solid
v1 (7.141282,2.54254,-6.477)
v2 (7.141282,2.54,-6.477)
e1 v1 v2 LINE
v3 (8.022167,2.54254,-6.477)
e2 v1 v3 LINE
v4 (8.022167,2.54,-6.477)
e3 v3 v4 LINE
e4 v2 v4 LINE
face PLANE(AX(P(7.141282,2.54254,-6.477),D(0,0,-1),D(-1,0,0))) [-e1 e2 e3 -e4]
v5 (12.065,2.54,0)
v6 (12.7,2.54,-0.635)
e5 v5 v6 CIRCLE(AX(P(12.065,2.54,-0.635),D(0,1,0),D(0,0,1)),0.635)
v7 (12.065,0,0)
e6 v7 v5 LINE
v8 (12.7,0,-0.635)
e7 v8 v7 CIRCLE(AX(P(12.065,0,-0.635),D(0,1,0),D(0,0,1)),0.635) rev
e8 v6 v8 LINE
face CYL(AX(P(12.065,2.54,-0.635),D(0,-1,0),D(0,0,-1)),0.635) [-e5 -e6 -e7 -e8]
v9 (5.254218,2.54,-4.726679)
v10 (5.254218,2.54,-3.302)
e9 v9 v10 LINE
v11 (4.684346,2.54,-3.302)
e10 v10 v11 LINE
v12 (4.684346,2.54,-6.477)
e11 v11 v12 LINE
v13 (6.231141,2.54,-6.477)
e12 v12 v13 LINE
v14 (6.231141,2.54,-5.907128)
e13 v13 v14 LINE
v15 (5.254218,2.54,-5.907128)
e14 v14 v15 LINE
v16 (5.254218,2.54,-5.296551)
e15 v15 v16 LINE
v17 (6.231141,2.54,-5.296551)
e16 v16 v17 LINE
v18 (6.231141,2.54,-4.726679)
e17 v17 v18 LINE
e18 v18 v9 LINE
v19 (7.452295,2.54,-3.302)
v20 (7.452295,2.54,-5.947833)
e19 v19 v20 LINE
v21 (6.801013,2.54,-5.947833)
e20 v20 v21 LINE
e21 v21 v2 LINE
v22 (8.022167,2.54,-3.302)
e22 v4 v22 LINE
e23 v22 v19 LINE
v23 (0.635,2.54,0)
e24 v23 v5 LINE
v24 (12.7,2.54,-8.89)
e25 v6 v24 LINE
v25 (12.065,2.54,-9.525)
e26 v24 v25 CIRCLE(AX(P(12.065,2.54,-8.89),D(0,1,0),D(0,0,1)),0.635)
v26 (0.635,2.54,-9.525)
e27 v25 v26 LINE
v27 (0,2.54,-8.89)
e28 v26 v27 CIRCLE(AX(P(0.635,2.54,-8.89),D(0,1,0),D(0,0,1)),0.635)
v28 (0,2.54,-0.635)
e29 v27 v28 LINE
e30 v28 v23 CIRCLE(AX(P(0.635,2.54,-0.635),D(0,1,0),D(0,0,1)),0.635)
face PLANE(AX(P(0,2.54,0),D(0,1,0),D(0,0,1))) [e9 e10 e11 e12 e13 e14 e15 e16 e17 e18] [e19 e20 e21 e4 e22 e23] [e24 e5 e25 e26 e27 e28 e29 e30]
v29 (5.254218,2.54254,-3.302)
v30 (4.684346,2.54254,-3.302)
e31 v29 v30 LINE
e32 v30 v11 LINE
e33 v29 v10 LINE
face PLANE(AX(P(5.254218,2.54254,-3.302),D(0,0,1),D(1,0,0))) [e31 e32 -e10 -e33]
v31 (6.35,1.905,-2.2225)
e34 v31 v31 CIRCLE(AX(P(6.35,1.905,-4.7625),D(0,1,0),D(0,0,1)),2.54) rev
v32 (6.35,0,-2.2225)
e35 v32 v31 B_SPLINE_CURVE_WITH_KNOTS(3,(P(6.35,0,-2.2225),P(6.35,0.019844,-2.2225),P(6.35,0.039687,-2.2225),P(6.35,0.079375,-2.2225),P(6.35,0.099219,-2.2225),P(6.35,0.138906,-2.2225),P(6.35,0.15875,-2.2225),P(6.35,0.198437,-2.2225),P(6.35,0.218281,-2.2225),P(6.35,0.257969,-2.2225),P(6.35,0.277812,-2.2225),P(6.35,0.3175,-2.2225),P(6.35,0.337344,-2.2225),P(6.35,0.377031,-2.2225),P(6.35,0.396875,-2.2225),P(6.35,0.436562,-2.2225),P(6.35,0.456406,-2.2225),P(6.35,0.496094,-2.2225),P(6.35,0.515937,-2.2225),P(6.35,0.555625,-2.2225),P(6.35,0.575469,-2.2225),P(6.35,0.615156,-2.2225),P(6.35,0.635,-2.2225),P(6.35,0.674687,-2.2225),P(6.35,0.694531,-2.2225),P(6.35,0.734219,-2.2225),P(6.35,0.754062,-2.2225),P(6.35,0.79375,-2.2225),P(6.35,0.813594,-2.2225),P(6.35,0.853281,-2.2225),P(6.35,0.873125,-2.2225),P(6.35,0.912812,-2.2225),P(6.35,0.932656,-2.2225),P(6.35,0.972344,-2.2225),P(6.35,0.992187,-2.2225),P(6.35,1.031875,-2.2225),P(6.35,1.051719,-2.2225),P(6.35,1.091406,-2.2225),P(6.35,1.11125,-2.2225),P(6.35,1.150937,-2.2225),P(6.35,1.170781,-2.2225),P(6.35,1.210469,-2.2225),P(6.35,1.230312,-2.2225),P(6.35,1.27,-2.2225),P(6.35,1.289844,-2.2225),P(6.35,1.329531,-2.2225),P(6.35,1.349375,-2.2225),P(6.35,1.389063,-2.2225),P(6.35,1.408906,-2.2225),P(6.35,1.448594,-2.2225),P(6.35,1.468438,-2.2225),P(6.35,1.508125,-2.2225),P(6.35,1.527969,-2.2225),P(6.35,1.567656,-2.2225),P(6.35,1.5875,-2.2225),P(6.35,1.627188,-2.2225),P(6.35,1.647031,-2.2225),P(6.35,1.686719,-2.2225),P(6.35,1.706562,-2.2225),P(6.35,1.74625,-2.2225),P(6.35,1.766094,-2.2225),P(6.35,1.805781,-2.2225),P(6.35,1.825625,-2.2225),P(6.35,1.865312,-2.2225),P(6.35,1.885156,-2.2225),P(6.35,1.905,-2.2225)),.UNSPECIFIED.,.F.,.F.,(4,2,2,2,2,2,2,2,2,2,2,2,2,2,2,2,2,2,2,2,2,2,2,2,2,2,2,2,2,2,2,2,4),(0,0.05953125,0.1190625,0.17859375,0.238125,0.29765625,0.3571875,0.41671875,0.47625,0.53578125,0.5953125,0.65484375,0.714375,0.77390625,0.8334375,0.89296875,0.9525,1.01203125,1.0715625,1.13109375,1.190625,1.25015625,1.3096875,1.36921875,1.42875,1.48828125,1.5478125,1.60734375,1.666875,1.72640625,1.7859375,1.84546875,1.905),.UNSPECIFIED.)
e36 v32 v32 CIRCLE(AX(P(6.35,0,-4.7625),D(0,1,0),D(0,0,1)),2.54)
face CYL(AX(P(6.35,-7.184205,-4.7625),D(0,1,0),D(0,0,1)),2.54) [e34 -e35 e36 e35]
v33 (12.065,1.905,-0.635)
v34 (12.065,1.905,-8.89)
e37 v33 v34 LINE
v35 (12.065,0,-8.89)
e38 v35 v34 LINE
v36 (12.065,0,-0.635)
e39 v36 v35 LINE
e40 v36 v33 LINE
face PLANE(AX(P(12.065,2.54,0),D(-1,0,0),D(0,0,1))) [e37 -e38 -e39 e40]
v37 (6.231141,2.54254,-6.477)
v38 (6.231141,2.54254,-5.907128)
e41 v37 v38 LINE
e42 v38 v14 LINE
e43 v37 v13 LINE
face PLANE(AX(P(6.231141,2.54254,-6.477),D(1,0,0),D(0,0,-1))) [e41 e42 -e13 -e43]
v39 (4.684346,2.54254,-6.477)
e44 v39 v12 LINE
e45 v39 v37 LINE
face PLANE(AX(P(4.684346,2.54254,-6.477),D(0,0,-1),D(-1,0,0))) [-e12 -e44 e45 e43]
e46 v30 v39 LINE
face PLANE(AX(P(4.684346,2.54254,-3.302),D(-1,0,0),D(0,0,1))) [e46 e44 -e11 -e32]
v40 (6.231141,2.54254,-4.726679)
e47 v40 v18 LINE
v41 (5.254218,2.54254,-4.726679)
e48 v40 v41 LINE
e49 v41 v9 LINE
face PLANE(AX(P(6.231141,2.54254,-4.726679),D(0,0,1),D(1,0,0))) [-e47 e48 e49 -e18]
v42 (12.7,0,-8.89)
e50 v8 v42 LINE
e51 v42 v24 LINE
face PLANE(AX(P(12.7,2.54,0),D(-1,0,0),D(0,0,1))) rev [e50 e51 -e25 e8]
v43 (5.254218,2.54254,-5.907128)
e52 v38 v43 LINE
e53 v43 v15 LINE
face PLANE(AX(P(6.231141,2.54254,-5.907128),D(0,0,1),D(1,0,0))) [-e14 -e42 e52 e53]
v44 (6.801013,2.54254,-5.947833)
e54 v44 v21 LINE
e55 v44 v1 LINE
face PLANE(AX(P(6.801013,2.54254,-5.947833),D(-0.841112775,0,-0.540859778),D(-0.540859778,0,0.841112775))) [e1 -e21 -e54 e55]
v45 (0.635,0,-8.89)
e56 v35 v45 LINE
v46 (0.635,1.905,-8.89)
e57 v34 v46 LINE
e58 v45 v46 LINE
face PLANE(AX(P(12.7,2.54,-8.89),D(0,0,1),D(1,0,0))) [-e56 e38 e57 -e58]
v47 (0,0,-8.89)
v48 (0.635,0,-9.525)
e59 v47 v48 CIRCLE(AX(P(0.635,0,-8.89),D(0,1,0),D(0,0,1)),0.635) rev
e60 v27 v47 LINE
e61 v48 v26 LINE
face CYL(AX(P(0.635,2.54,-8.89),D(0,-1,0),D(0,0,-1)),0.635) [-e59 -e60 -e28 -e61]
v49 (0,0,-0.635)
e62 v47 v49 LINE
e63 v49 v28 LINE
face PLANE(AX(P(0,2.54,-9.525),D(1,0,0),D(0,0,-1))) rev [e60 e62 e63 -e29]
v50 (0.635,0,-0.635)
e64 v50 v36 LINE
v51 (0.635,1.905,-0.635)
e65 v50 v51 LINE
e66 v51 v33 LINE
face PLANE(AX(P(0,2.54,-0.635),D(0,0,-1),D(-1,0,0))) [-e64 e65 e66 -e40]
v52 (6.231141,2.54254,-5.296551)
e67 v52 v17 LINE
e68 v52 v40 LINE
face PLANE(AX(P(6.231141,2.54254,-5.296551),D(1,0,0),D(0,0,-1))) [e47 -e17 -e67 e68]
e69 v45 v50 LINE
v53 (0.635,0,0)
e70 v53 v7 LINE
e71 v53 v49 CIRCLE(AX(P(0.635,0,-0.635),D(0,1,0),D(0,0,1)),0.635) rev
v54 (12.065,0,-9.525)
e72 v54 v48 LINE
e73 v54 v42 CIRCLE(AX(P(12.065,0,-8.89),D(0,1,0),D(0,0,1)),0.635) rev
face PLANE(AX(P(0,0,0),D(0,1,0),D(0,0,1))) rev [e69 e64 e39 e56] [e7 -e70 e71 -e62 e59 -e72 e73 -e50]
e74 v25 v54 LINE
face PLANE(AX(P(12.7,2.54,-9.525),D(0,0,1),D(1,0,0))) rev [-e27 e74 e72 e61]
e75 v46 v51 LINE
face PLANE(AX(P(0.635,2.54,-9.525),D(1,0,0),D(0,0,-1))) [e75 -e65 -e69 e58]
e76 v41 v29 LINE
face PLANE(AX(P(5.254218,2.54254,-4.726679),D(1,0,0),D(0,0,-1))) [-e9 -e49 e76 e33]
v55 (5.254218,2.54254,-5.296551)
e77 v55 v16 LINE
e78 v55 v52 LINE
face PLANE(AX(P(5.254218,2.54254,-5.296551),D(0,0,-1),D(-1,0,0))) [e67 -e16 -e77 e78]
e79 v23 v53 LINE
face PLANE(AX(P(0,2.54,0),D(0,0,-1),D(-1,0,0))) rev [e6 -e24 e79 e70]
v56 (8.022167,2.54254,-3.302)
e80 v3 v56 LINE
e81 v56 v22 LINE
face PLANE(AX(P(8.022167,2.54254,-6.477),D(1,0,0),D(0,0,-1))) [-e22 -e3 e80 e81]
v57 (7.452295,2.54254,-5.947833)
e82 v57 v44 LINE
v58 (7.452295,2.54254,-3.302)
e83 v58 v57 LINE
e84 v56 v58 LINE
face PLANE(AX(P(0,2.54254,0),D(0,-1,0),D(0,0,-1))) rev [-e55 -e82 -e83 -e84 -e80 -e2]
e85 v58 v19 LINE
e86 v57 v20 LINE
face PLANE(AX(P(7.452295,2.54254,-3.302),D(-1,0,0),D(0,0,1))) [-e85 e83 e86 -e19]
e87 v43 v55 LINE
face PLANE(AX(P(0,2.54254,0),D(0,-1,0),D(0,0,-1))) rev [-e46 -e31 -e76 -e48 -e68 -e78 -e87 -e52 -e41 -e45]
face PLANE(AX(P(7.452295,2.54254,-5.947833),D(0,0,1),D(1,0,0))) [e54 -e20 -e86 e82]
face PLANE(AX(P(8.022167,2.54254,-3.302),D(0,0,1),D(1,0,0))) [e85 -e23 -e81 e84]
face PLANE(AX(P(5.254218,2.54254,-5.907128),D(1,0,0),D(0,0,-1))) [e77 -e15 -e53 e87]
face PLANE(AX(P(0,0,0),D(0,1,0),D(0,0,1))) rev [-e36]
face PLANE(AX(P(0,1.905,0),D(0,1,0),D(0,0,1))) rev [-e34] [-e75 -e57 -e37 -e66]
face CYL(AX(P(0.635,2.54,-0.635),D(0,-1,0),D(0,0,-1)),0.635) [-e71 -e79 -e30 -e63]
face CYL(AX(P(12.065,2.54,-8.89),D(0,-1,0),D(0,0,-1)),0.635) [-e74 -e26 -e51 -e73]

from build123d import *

# Parameters (mm, degrees)
SKETCH1_W           = 12.7
SKETCH1_H           = 9.525
BOSS_EXTRUDE1_DEPTH = 2.54
FILLET1_R           = 0.635
SHELL1_START        = 0.635
SHELL1_OUTLINE_W    = 1.905
SHELL1_OUTLINE_H    = 8.255
SHELL1_DEPTH        = 11.43
SKETCH2_R           = 2.54
BOSS_EXTRUDE2_DEPTH = 1.905
BOSS_EXTRUDE3_DEPTH = 0.00254


# Read off the part's stored shape, not the designer's step: Shell1
with BuildPart() as part:
    # Sketch1 → Boss-Extrude1 (new body)
    with BuildSketch(Plane(origin=(0, 0, 0), x_dir=(1, 0, 0), z_dir=(0, 1, 0))):
        with Locations((6.35, 4.7625)):
            Rectangle(SKETCH1_W, SKETCH1_H)
    extrude(amount=BOSS_EXTRUDE1_DEPTH)

    # Fillet1
    fillet1_edges = [part.edges().sort_by_distance(p)[0] for p in [
        (0, 1.27, -9.525),
        (12.7, 1.27, -9.525),
        (12.7, 1.27, 0),
        (0, 1.27, 0),
    ]]
    fillet(fillet1_edges, radius=FILLET1_R)

    # Shell1 outline → Shell1 (cut)
    with BuildSketch(Plane.YZ.offset(SHELL1_START)):
        with Locations((0.9525, -4.7625)):
            Rectangle(SHELL1_OUTLINE_W, SHELL1_OUTLINE_H)
    extrude(amount=SHELL1_DEPTH, mode=Mode.SUBTRACT)

    # Sketch2 → Boss-Extrude2 (add)
    with BuildSketch(Plane(origin=(0, 1.905, 0), x_dir=(-1, 0, 0), z_dir=(0, -1, 0))):
        with Locations(Location((-6.35, 4.7625, 0), (0, 0, 270))):
            Circle(SKETCH2_R)
    extrude(amount=BOSS_EXTRUDE2_DEPTH)

    # Sketch3 → Boss-Extrude3 (add)
    with BuildSketch(Plane(origin=(0, 2.54, 0), x_dir=(1, 0, 0), z_dir=(0, 1, 0))):
        Polygon((4.684346154, 6.477), (6.231141026, 6.477), (6.231141026, 5.907128205), (5.254217949, 5.907128205), (5.254217949, 5.296551282), (6.231141026, 5.296551282), (6.231141026, 4.726679487), (5.254217949, 4.726679487), (5.254217949, 3.302), (4.684346154, 3.302), align=None)
        Polygon((7.141282252, 6.477), (8.022166667, 6.477), (8.022166667, 3.302), (7.452294872, 3.302), (7.452294872, 5.947833333), (6.801012821, 5.947833333), align=None)
    extrude(amount=BOSS_EXTRUDE3_DEPTH)


solid = part.part
